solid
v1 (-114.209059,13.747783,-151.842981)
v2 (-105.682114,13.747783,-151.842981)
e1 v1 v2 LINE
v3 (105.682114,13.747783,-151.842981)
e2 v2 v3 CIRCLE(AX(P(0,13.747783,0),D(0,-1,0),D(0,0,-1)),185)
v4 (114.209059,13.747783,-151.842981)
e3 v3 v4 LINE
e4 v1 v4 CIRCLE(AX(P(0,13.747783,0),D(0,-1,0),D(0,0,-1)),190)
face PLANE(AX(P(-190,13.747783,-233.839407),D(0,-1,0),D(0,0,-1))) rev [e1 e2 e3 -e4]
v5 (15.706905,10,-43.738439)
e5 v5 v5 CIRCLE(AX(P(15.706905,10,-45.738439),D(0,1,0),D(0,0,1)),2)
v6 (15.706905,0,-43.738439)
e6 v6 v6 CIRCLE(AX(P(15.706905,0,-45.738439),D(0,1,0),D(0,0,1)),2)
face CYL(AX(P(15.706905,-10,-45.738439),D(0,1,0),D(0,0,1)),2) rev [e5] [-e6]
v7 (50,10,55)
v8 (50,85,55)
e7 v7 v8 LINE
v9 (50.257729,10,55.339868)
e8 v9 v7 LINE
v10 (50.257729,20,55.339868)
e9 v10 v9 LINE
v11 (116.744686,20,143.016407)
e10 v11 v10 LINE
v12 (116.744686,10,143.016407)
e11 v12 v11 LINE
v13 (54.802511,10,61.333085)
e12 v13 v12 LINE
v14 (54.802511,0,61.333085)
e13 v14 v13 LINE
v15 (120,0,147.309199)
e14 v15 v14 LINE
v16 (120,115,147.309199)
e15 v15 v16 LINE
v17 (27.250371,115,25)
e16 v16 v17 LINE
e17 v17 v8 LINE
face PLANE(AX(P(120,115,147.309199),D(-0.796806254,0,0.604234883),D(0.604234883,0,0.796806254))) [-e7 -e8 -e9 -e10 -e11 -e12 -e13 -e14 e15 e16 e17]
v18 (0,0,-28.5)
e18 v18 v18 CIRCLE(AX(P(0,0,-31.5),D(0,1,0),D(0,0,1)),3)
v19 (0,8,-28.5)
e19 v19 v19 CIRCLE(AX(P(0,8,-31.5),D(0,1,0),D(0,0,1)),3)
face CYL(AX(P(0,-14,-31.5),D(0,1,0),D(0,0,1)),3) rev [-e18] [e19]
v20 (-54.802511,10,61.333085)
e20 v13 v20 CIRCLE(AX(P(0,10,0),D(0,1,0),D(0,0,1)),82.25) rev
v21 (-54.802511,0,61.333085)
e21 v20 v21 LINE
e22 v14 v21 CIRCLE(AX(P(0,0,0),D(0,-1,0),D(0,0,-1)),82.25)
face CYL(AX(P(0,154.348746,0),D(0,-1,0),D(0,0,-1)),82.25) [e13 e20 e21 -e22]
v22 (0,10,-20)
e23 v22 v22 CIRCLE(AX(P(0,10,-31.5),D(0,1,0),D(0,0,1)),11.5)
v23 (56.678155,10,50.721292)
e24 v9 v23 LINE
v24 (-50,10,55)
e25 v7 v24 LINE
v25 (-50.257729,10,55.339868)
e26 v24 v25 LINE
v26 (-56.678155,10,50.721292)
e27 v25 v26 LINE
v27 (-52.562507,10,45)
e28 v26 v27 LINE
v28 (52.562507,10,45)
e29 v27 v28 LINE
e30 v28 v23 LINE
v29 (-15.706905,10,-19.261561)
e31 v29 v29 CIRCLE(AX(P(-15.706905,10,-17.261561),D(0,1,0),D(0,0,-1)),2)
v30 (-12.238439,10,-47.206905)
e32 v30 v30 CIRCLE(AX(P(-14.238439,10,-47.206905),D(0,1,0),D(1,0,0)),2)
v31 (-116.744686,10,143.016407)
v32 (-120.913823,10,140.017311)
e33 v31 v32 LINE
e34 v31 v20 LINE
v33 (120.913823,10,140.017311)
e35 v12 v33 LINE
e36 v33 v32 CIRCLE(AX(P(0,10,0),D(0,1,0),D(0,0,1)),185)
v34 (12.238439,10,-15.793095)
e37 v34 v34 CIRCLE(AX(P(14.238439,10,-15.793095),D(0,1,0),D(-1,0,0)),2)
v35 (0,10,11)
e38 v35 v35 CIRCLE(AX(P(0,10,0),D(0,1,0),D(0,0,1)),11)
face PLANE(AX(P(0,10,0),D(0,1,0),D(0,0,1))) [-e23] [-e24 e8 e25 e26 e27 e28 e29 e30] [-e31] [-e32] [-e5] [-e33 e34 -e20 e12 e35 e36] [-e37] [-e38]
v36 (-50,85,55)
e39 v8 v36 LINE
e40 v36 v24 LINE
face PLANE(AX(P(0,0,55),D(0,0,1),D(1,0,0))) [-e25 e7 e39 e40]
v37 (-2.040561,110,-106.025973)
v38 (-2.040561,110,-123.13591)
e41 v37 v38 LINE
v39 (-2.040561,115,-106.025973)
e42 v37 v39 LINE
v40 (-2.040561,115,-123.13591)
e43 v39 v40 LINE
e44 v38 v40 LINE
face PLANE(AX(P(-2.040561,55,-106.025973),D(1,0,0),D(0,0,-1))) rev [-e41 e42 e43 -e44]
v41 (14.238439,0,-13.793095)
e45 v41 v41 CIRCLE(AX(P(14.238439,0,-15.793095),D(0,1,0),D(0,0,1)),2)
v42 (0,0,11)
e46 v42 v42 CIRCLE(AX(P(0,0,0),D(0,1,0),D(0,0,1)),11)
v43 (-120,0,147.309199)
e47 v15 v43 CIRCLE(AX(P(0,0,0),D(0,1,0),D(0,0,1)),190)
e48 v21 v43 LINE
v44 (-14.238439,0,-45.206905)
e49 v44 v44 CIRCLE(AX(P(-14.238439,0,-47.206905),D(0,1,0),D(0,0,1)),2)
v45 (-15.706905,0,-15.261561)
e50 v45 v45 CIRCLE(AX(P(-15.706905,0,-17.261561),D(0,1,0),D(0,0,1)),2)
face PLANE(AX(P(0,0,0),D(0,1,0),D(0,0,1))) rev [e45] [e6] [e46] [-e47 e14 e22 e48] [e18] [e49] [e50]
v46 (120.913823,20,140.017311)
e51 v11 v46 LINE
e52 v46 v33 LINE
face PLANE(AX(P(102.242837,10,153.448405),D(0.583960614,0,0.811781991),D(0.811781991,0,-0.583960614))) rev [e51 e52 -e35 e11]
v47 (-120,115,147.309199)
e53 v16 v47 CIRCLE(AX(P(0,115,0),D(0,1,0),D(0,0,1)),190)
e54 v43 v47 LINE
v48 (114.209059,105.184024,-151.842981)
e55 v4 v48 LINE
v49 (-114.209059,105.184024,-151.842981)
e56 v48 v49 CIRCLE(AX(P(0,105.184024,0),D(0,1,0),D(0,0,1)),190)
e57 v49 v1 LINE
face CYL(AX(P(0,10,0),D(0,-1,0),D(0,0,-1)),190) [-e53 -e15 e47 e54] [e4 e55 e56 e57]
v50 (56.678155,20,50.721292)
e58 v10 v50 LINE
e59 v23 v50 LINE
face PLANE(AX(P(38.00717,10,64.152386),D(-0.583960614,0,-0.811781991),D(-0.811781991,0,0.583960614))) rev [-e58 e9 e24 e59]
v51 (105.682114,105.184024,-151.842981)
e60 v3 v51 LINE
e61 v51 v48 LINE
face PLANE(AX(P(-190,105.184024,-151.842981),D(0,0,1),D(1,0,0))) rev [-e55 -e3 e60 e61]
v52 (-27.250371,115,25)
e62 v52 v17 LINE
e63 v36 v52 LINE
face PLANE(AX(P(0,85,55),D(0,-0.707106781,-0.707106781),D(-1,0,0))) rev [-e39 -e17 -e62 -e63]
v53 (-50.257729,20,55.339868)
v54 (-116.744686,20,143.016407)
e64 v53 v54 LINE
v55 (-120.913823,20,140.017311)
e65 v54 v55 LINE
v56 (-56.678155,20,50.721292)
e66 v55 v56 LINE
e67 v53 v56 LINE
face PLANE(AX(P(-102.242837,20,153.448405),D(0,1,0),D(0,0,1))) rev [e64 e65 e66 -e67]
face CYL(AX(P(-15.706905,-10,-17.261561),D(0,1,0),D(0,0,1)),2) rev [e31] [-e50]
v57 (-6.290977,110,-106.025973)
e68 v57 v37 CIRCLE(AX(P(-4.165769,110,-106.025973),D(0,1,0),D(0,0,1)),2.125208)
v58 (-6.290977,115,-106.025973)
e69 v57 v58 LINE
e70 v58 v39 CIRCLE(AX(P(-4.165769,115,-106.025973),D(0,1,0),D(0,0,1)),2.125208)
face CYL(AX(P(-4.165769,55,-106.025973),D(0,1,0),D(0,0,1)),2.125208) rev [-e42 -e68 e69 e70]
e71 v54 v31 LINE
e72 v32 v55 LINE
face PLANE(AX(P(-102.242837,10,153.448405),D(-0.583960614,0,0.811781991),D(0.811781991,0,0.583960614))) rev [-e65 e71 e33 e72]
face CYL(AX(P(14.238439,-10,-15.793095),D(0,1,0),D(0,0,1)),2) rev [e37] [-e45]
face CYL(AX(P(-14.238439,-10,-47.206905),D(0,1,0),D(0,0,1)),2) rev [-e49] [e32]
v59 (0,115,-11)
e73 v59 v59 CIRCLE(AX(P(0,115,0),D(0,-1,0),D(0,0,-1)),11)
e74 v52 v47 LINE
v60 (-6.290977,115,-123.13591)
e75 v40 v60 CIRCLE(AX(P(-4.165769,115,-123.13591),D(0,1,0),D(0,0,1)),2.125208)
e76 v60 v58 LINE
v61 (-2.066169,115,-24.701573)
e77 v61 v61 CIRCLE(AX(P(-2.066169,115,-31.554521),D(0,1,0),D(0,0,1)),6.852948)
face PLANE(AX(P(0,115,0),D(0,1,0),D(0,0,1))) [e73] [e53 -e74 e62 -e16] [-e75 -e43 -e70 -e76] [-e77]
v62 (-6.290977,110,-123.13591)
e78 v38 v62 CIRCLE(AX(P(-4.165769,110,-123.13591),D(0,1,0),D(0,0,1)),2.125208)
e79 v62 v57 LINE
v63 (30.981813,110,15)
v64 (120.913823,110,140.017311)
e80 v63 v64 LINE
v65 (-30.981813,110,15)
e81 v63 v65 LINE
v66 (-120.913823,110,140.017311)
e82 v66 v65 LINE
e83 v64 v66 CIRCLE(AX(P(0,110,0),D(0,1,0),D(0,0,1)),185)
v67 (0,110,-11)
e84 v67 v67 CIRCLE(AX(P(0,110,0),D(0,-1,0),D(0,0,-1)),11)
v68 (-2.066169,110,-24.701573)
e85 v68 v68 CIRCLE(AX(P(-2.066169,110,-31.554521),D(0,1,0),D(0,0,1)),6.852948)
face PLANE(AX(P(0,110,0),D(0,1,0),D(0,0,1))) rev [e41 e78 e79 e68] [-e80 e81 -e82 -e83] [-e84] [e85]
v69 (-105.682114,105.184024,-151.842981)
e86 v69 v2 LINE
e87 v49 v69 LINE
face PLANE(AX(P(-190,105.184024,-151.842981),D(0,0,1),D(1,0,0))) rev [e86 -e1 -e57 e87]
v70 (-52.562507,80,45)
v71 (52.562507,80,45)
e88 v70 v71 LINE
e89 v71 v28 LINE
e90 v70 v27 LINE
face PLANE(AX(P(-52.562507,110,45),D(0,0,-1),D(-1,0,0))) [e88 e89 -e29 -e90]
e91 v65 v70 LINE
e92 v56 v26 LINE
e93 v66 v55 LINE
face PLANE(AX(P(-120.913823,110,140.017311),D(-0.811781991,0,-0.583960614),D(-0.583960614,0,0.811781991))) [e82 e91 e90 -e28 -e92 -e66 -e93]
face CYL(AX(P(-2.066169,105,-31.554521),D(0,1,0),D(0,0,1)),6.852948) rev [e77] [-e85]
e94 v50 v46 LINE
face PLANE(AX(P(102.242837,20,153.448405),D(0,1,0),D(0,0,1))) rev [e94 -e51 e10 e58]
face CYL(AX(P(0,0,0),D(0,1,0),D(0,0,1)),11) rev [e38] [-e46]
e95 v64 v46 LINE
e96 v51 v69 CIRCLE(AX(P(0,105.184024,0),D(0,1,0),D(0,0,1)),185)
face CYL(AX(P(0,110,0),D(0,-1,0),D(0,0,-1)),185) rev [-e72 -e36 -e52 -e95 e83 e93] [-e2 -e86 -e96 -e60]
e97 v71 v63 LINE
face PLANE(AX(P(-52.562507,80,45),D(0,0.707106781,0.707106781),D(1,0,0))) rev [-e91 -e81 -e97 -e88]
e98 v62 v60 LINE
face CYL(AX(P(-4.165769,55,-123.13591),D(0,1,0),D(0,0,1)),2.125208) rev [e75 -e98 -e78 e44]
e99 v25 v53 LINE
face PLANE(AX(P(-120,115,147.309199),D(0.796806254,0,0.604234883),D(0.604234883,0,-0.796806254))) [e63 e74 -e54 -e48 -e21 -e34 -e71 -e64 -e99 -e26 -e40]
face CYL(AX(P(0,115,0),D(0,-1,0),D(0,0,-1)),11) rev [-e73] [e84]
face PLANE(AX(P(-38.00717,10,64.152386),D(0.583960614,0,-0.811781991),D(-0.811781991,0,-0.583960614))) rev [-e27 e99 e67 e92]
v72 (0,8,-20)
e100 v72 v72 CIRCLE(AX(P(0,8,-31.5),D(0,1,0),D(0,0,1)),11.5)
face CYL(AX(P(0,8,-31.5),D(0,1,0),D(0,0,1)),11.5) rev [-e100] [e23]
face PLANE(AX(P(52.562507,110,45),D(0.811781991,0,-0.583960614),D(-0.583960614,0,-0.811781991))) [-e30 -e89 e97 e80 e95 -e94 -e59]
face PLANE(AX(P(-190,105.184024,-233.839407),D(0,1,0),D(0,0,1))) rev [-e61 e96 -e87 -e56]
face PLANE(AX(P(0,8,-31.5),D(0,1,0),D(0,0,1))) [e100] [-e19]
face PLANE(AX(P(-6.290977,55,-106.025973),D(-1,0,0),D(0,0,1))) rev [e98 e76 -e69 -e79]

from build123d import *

# Parameters (mm, degrees)
SKETCH_1_R                = 190
EXTRUDE_1_DEPTH           = 10
SKETCH_2_R                = 11
CUT_EXTRUDE_1_DEPTH       = 10
CUT_EXTRUDE_2_DEPTH       = 10
CUT_EXTRUDE_3_DEPTH       = 10
SKETCH_5_R                = 11.5
CUT_EXTRUDE_4_DEPTH       = 2
SKETCH_6_R                = 3
CUT_EXTRUDE_5_DEPTH       = 22
SKETCH_7_R                = 2
CUT_EXTRUDE_6_DEPTH       = 20
PATTERN_CIRCULAR_1_COUNT  = 4
EXTRUDE_2_DEPTH           = 100
EXTRUDE_3_DEPTH           = 5
CUT_EXTRUDE_START         = -5
SKETCH_11_R               = 11
CUT_EXTRUDE_7_DEPTH       = 5
SKETCH_12_W               = 100
SKETCH_12_H               = 115
EXTRUDE_4_DEPTH           = 5
EXTRUDE_5_DEPTH           = 115
CUT_EXTRUDE_8_DEPTH       = 289.487434735
SKETCH_15_W               = 110
SKETCH_15_H               = 10
CUT_EXTRUDE_9_DEPTH       = 23
SKETCH_16_W               = 110
SKETCH_16_H               = 10
CUT_EXTRUDE_10_DEPTH      = 23
EXTRUDE_6_DEPTH           = 10
SKETCH_18_R               = 10
EXTRUDE_7_DEPTH           = 100
SKETCH_20_W               = 40.15762627
SKETCH_20_H               = 37.957208392
EXTRUDE_8_DEPTH           = 20
CUT_EXTRUDE_11_DEPTH      = 70
SKETCH_22_W               = 6
SKETCH_22_H               = 39.800206828
SKETCH_24_R               = 10.715541735
EXTRUDE_9_DEPTH           = 50
SKETCH_25_R               = 8.111462828
CUT_EXTRUDE_13_DEPTH      = 1
FILLET_2_R                = 3
SKETCH_26_W               = 20.914862296
SKETCH_26_H               = 66.390296829
CUT_EXTRUDE_14_DEPTH      = 41
EXTRUDE_START             = -5
EXTRUDE_10_DEPTH          = 5
CUT_EXTRUDE_15_DEPTH      = 369.496652909
CUT_EXTRUDE_15_DEPTH_BACK = 369.496652909
SKETCH_28_W               = 81.996426071
SKETCH_28_H               = 91.436240801
EXTRUDE_11_DEPTH          = 142
SKETCH_30_W               = 61.807944975
SKETCH_30_H               = 65.134221846
EXTRUDE_12_DEPTH          = 5
FILLET_4_R                = 13
SKETCH_31_W               = 61.807944975
SKETCH_31_H               = 147
EXTRUDE_13_DEPTH          = 70
SKETCH_32_W               = 51.807944975
SKETCH_32_H               = 142
CUT_EXTRUDE_16_DEPTH      = 60
FILLET_5_R                = 13
FILLET_6_R                = 13
CUT_EXTRUDE_17_DEPTH      = 60
CUT_EXTRUDE_18_DEPTH      = 60
EXTRUDE_START_2           = -75
SKETCH_35_W               = 61.807944975
SKETCH_35_H               = 6.562212177
EXTRUDE_14_DEPTH          = 75
CUT_EXTRUDE_19_DEPTH      = 60
CUT_EXTRUDE_START_2       = 70
CUT_EXTRUDE_20_DEPTH      = 70
SKETCH_40_R               = 6.852948308
CUT_EXTRUDE_24_DEPTH      = 10
CHAMFER_1_SIZE            = 30
CHAMFER_2_SIZE            = 30
CUT_EXTRUDE_25_DEPTH      = 216


# Read off the part's stored shape, not the designer's step: 圆顶1
with BuildPart() as part:
    # 草图1 → 凸台-拉伸1 (new body)
    with BuildSketch(Plane(origin=(0, 0, 0), x_dir=(1, 0, 0), z_dir=(0, 1, 0))):
        with Locations(Location((0, 0, 0), (0, 0, 270))):
            Circle(SKETCH_1_R)
    extrude(amount=EXTRUDE_1_DEPTH)

    # 草图2 → 切除-拉伸1 (cut)
    with BuildSketch(Plane(origin=(0, 10, 0), x_dir=(1, 0, 0), z_dir=(0, 1, 0))):
        with Locations(Location((0, 0, 0), (0, 0, 270))):
            Circle(SKETCH_2_R)
    extrude(amount=-CUT_EXTRUDE_1_DEPTH, mode=Mode.SUBTRACT)

    # 草图3 → 切除-拉伸2 (cut)
    with BuildSketch(Plane(origin=(0, 10, 0), x_dir=(1, 0, 0), z_dir=(0, 1, 0))):
        Polygon((-50, -50), (-120, -147.309198627), (120, -147.309198627), (50, -50), align=None)
    extrude(amount=-CUT_EXTRUDE_2_DEPTH, mode=Mode.SUBTRACT)

    # 草图4 → 切除-拉伸3 (cut)
    with BuildSketch(Plane(origin=(0, 10, 0), x_dir=(1, 0, 0), z_dir=(0, 1, 0))):
        Polygon((50, -50), (136.06201209, -169.637506124), (-54.476164161, -215.928987862), (-150.534220248, -169.637506124), (-120, -147.309198627), (-80.889727825, -92.940780863), align=None)
    extrude(amount=-CUT_EXTRUDE_3_DEPTH, mode=Mode.SUBTRACT)

    # 草图5 → 切除-拉伸4 (cut)
    with BuildSketch(Plane(origin=(0, 10, 0), x_dir=(1, 0, 0), z_dir=(0, 1, 0))):
        with Locations(Location((0, 31.5, 0), (0, 0, 270))):
            Circle(SKETCH_5_R)
    extrude(amount=-CUT_EXTRUDE_4_DEPTH, mode=Mode.SUBTRACT)

    # 草图6 → 切除-拉伸5 (cut)
    with BuildSketch(Plane(origin=(0, 8, 0), x_dir=(1, 0, 0), z_dir=(0, 1, 0))):
        with Locations(Location((0, 31.5, 0), (0, 0, 270))):
            Circle(SKETCH_6_R)
    extrude(amount=-CUT_EXTRUDE_5_DEPTH, mode=Mode.SUBTRACT)

    # 草图7 → 切除-拉伸6 (cut)
    with BuildSketch(Plane(origin=(0, 10, 0), x_dir=(1, 0, 0), z_dir=(0, 1, 0))):
        with Locations(Location((15.706904535, 45.738439167, 0), (0, 0, 270))):
            Circle(SKETCH_7_R)
    cut_extrude_6 = extrude(amount=-CUT_EXTRUDE_6_DEPTH, mode=Mode.SUBTRACT)

    # 阵列(圆周)1: 切除-拉伸6 ×4 about axis
    pattern_circular_1_axis = Axis((0, 0, -31.5), (0, 1, 0))
    for i in range(1, PATTERN_CIRCULAR_1_COUNT):
        add(cut_extrude_6.rotate(pattern_circular_1_axis, i * 360 / PATTERN_CIRCULAR_1_COUNT), mode=Mode.SUBTRACT)

    # 草图9 → 凸台-拉伸2 (add)
    with BuildSketch(Plane(origin=(0, 10, 0), x_dir=(1, 0, 0), z_dir=(0, 1, 0))):
        with BuildLine():
            Line((50, -50), (120, -147.309198627))
            ThreePointArc((120, -147.309198627), (0, 190), (-120, -147.309198627))
            Line((-120, -147.309198627), (-50, -50))
            Line((-50, -50), (50, -50))
        make_face()
        with BuildLine():
            Line((52.56250687, -45), (120.913822869, -140.017311213))
            ThreePointArc((120.913822869, -140.017311213), (0, 185), (-120.913822869, -140.017311213))
            Line((-120.913822869, -140.017311213), (-52.56250687, -45))
            Line((-52.56250687, -45), (52.56250687, -45))
        make_face(mode=Mode.SUBTRACT)
    extrude(amount=EXTRUDE_2_DEPTH)

    # 草图10 → 凸台-拉伸3 (add)
    with BuildSketch(Plane(origin=(0, 110, 0), x_dir=(1, 0, 0), z_dir=(0, 1, 0))):
        with BuildLine():
            Line((-50, -50), (50, -50))
            Line((50, -50), (120, -147.309198627))
            ThreePointArc((120, -147.309198627), (0, 190), (-120, -147.309198627))
            Line((-120, -147.309198627), (-50, -50))
        make_face()
    extrude(amount=EXTRUDE_3_DEPTH)

    # 草图11 → 切除-拉伸7 (cut)
    with BuildSketch(Plane.XZ.offset(-110).offset(CUT_EXTRUDE_START)):
        with Locations(Location((0, 0, 0), (0, 0, 90))):
            Circle(SKETCH_11_R)
    extrude(amount=CUT_EXTRUDE_7_DEPTH, mode=Mode.SUBTRACT)

    # 草图12 → 凸台-拉伸4 (add)
    with BuildSketch(Plane.XY.offset(50)):
        with Locations((0, 57.5)):
            Rectangle(SKETCH_12_W, SKETCH_12_H)
    extrude(amount=EXTRUDE_4_DEPTH)

    # 草图13 → 凸台-拉伸5 (add)
    with BuildSketch(Plane.XZ):
        Polygon((-120, 147.309198627), (-50, 55), (-50, 50), align=None)
        Polygon((50, 50), (120, 147.309198627), (50, 55), align=None)
    extrude(amount=-EXTRUDE_5_DEPTH)

    # 草图14 → 切除-拉伸8 (cut, through all)
    with BuildSketch(Plane(origin=(0, 10, 0), x_dir=(1, 0, 0), z_dir=(0, 1, 0))):
        with BuildLine():
            Line((-175, 60), (175, 60))
            ThreePointArc((175, 60), (0, 185), (-175, 60))
        make_face()
    extrude(amount=CUT_EXTRUDE_8_DEPTH, mode=Mode.SUBTRACT)

    # 草图15 → 切除-拉伸9 (cut)
    with BuildSketch(Plane(origin=(-13.305974514, 0, -9.571738635), x_dir=(-0.5839606140594331, 0, 0.8117819911942675), z_dir=(-0.8117819911942675, 0, -0.5839606140594331))):
        with Locations((129.272441949, 15)):
            Rectangle(SKETCH_15_W, SKETCH_15_H)
    extrude(amount=-CUT_EXTRUDE_9_DEPTH, mode=Mode.SUBTRACT)

    # 草图16 → 切除-拉伸10 (cut)
    with BuildSketch(Plane(origin=(13.305974514, 0, -9.571738635), x_dir=(-0.5839606140594333, 0, -0.8117819911942674), z_dir=(0.8117819911942673, 0, -0.5839606140594332))):
        with Locations((-129.272441949, 15)):
            Rectangle(SKETCH_16_W, SKETCH_16_H)
    extrude(amount=-CUT_EXTRUDE_10_DEPTH, mode=Mode.SUBTRACT)

    # 草图17 → 凸台-拉伸6 (add)
    with BuildSketch(Plane.XZ):
        with BuildLine():
            Line((-68.721971502, 45.192401274), (70.16486598, 42.91799252))
            ThreePointArc((70.16486598, 42.91799252), (1.34674419, 82.238973608), (-68.721971502, 45.192401274))
        make_face()
    extrude(amount=-EXTRUDE_6_DEPTH)

    # 草图18 → 凸台-拉伸7 (add)
    with BuildSketch(Plane(origin=(0, 115, 0), x_dir=(1, 0, 0), z_dir=(0, 1, 0))):
        with Locations(Location((0, 46.854928923, 0), (0, 0, 90))):
            Circle(SKETCH_18_R)
    extrude(amount=EXTRUDE_7_DEPTH)

    # 草图20 → 凸台-拉伸8 (add)
    with BuildSketch(Plane(origin=(0, 215, 0), x_dir=(1, 0, 0), z_dir=(0, 1, 0))):
        with Locations((-0.847426087, 46.622471939)):
            Rectangle(SKETCH_20_W, SKETCH_20_H)
    extrude(amount=EXTRUDE_8_DEPTH)

    # 草图21 → 切除-拉伸11 (cut)
    with BuildSketch(Plane.ZY.offset(20.926239222)):
        Polygon((-54.791741718, 236.72389037), (-19.944006341, 217.982251176), (-19.065492004, 240.530785832), align=None)
    extrude(amount=-CUT_EXTRUDE_11_DEPTH, mode=Mode.SUBTRACT)

    # 草图22 → 旋转1 (revolve)
    with BuildSketch(Plane(origin=(0, 160.757687824, 86.457916141), x_dir=(1, 0, 0), z_dir=(0, 0.8807086333026608, 0.4736584246333635)), mode=Mode.PRIVATE) as revolve_1_sk:
        with Locations((1.240539722, 142.968257651)):
            Rectangle(SKETCH_22_W, SKETCH_22_H)
    revolve(revolve_1_sk.sketch.rotate(Axis((-1.759460278, 237.901659149, -56.981655541), (0, -0.47365842463336366, 0.8807086333026606)), 90), axis=Axis((-1.759460278, 237.901659149, -56.981655541), (0, -0.47365842463336366, 0.8807086333026606)))

    # 草图24 → 凸台-拉伸9 (add)
    with BuildSketch(Plane(origin=(0, 58.292268059, -108.387185922), x_dir=(1, 0, 0), z_dir=(0, -0.4736584246333635, 0.8807086333026606))):
        with Locations(Location((-1.759460278, 182.532203893, 0), (0, 0, 270))):
            Circle(SKETCH_24_R)
    extrude(amount=-EXTRUDE_9_DEPTH)

    # 草图25 → 切除-拉伸13 (cut)
    with BuildSketch(Plane(origin=(0, 58.292268059, -108.387185922), x_dir=(1, 0, 0), z_dir=(0, -0.4736584246333635, 0.8807086333026606))):
        with Locations(Location((-1.759460278, 182.532203893, 0), (0, 0, 270))):
            Circle(SKETCH_25_R)
    extrude(amount=-CUT_EXTRUDE_13_DEPTH, mode=Mode.SUBTRACT)

    # 圆角2
    fillet_2_edges = [part.edges().sort_by_distance(p)[0] for p in [
        (0, 115, -36.854928923),
    ]]
    fillet(fillet_2_edges, radius=FILLET_2_R)

    # 草图26 → 切除-拉伸14 (cut)
    with BuildSketch(Plane(origin=(0, 160.757687824, 86.457916141), x_dir=(1, 0, 0), z_dir=(0, 0.8807086333026608, 0.4736584246333635))):
        with Locations((27.855490238, 146.001600843)):
            Rectangle(SKETCH_26_W, SKETCH_26_H)
    extrude(amount=-CUT_EXTRUDE_14_DEPTH, mode=Mode.SUBTRACT)

    # 草图27 → 凸台-拉伸10 (add)
    with BuildSketch(Plane(origin=(0, 115, 0), x_dir=(1, 0, 0), z_dir=(0, 1, 0)).offset(EXTRUDE_START)):
        with BuildLine():
            Line((-175, 60), (175, 60))
            ThreePointArc((175, 60), (0, 185), (-175, 60))
        make_face()
    extrude(amount=EXTRUDE_10_DEPTH)

    # 草图28 → 切除-拉伸15 (cut, two sides: drawn at the far end of the back side and taken through both)
    with BuildSketch(Plane(origin=(0, 0, 0), x_dir=(0, 0, -1), z_dir=(1, 0, 0)).offset(-CUT_EXTRUDE_15_DEPTH_BACK)):
        with Locations((192.841193776, 59.465903433)):
            Rectangle(SKETCH_28_W, SKETCH_28_H)
    extrude(amount=CUT_EXTRUDE_15_DEPTH + CUT_EXTRUDE_15_DEPTH_BACK, mode=Mode.SUBTRACT)

    # 草图29 → 凸台-拉伸11 (add)
    with BuildSketch(Plane(origin=(0, 115, 0), x_dir=(1, 0, 0), z_dir=(0, 1, 0))):
        Polygon((-32.985541705, 83.704196909), (-32.985541705, 18.569975063), (-27.985541705, 18.569975063), (-27.985541705, 78.704196909), (23.82240327, 78.704196909), (23.82240327, 18.569975063), (28.82240327, 18.569975063), (28.82240327, 83.704196909), align=None)
    extrude(amount=EXTRUDE_11_DEPTH)

    # 草图30 → 凸台-拉伸12 (add)
    with BuildSketch(Plane(origin=(0, 257, 0), x_dir=(1, 0, 0), z_dir=(0, 1, 0))):
        with Locations((-2.081569218, 51.137085986)):
            Rectangle(SKETCH_30_W, SKETCH_30_H)
    extrude(amount=EXTRUDE_12_DEPTH)

    # 圆角4
    fillet_4_edges = [part.edges().sort_by_distance(p)[0] for p in [
        (-27.985541705, 257, -48.637085986),
        (23.82240327, 257, -48.637085986),
    ]]
    fillet(fillet_4_edges, radius=FILLET_4_R)

    # 草图31 → 凸台-拉伸13 (add)
    with BuildSketch(Plane(origin=(0, 0, -83.704196909), x_dir=(-1, 0, 0), z_dir=(0, 0, -1))):
        with Locations((2.081569218, 188.5)):
            Rectangle(SKETCH_31_W, SKETCH_31_H)
    extrude(amount=EXTRUDE_13_DEPTH)

    # 草图32 → 切除-拉伸16 (cut)
    with BuildSketch(Plane(origin=(0, 0, -153.704196909), x_dir=(-1, 0, 0), z_dir=(0, 0, -1))):
        with Locations((2.081569218, 186)):
            Rectangle(SKETCH_32_W, SKETCH_32_H)
    extrude(amount=-CUT_EXTRUDE_16_DEPTH, mode=Mode.SUBTRACT)

    # 圆角5
    fillet_5_edges = [part.edges().sort_by_distance(p)[0] for p in [
        (-32.985541705, 262, -86.137085986),
        (28.82240327, 262, -86.137085986),
    ]]
    fillet(fillet_5_edges, radius=FILLET_5_R)

    # 圆角6
    fillet_6_edges = [part.edges().sort_by_distance(p)[0] for p in [
        (23.82240327, 257, -123.704196909),
        (-27.985541705, 257, -123.704196909),
    ]]
    fillet(fillet_6_edges, radius=FILLET_6_R)

    # 草图33 → 切除-拉伸17 (cut)
    with BuildSketch(Plane.XY.offset(-78.704196909)):
        with BuildLine():
            Line((13.892318938, 199.249147057), (13.892318938, 143.139086494))
            ThreePointArc((13.892318938, 143.139086494), (0, 129.246767556), (-13.892318938, 143.139086494))
            Line((-13.892318938, 143.139086494), (-13.892318938, 199.249147057))
            ThreePointArc((-13.892318938, 199.249147057), (0, 213.141465996), (13.892318938, 199.249147057))
        make_face()
    extrude(amount=-CUT_EXTRUDE_17_DEPTH, mode=Mode.SUBTRACT)

    # 草图34 → 切除-拉伸18 (cut)
    with BuildSketch(Plane(origin=(0, 115, 0), x_dir=(1, 0, 0), z_dir=(0, 1, 0))):
        with BuildLine():
            Line((-6.290976551, 106.02597296), (-6.290976551, 123.135910488))
            ThreePointArc((-6.290976551, 123.135910488), (-4.165768662, 125.261118376), (-2.040560774, 123.135910488))
            Line((-2.040560774, 123.135910488), (-2.040560774, 106.02597296))
            ThreePointArc((-2.040560774, 106.02597296), (-4.165768662, 103.900765071), (-6.290976551, 106.02597296))
        make_face()
    extrude(amount=-CUT_EXTRUDE_18_DEPTH, mode=Mode.SUBTRACT)

    # 草图35 → 凸台-拉伸14 (add)
    with BuildSketch(Plane(origin=(0, 0, -153.704196909), x_dir=(-1, 0, 0), z_dir=(0, 0, -1)).offset(EXTRUDE_START_2)):
        with Locations((2.081569218, 185.281106088)):
            Rectangle(SKETCH_35_W, SKETCH_35_H)
    extrude(amount=EXTRUDE_14_DEPTH)

    # 草图36 → 切除-拉伸19 (cut)
    with BuildSketch(Plane(origin=(0, 188.562212177, 0), x_dir=(1, 0, 0), z_dir=(0, 1, 0))):
        with BuildLine():
            Line((-6.290976551, 123.135910488), (-6.290976551, 106.02597296))
            ThreePointArc((-6.290976551, 106.02597296), (-4.165768662, 103.900765071), (-2.040560774, 106.02597296))
            Line((-2.040560774, 106.02597296), (-2.040560774, 123.135910488))
            ThreePointArc((-2.040560774, 123.135910488), (-4.165768662, 125.261118376), (-6.290976551, 123.135910488))
        make_face()
    extrude(amount=-CUT_EXTRUDE_19_DEPTH, mode=Mode.SUBTRACT)

    # 圆顶1 outline → 圆顶1 (revolve)
    with BuildSketch(Plane(origin=(-1.759460278, 160.757687824, 86.457916141), x_dir=(1, 0, 0), z_dir=(0, 0.880708633302661, 0.473658424633363))):
        with BuildLine():
            Line((0, 124.068154246), (0, 119.068154237))
            ThreePointArc((0, 119.068154237), (4.764342278, 120.41858011), (8.111462832, 124.068154246))
            Line((8.111462832, 124.068154246), (0, 124.068154246))
        make_face()
    revolve(axis=Axis((-1.759460278, 160.757687824, 86.457916141), (0, 0.473658424633363, -0.880708633302661)))

    # 草图37 → 切除-拉伸20 (cut)
    with BuildSketch(Plane.XY.offset(-78.704196909).offset(CUT_EXTRUDE_START_2)):
        with BuildLine():
            Line((-27.985541705, 115), (23.82240327, 115))
            Line((23.82240327, 115), (23.82240327, 244))
            ThreePointArc((23.82240327, 244), (20.014791425, 253.192388155), (10.82240327, 257))
            Line((10.82240327, 257), (-14.985541705, 257))
            ThreePointArc((-14.985541705, 257), (-24.177929861, 253.192388155), (-27.985541705, 244))
            Line((-27.985541705, 244), (-27.985541705, 115))
        make_face()
    extrude(amount=-CUT_EXTRUDE_20_DEPTH, mode=Mode.SUBTRACT)

    # 草图40 → 切除-拉伸24 (cut)
    with BuildSketch(Plane(origin=(0, 115, 0), x_dir=(1, 0, 0), z_dir=(0, 1, 0))):
        with Locations(Location((-2.06616942, 31.55452141, 0), (0, 0, 270))):
            Circle(SKETCH_40_R)
    extrude(amount=-CUT_EXTRUDE_24_DEPTH, mode=Mode.SUBTRACT)

    # 倒角1
    chamfer_1_edges = [part.edges().sort_by_distance(p)[0] for p in [
        (0, 115, 55),
    ]]
    chamfer(chamfer_1_edges, length=CHAMFER_1_SIZE)

    # 倒角2
    chamfer_2_edges = [part.edges().sort_by_distance(p)[0] for p in [
        (0, 110, 45),
    ]]
    chamfer(chamfer_2_edges, length=CHAMFER_2_SIZE)

    # 草图41 → 切除-拉伸25 (cut)
    with BuildSketch(Plane(origin=(0, 115, 0), x_dir=(1, 0, 0), z_dir=(0, 1, 0))):
        with BuildLine():
            Line((-120, -147.309198627), (-27.250371239, -25))
            Line((-27.250371239, -25), (27.250371239, -25))
            Line((27.250371239, -25), (120, -147.309198627))
            ThreePointArc((120, -147.309198627), (0, 190), (-120, -147.309198627))
        make_face()
    extrude(amount=CUT_EXTRUDE_25_DEPTH, mode=Mode.SUBTRACT)


solid = part.part
